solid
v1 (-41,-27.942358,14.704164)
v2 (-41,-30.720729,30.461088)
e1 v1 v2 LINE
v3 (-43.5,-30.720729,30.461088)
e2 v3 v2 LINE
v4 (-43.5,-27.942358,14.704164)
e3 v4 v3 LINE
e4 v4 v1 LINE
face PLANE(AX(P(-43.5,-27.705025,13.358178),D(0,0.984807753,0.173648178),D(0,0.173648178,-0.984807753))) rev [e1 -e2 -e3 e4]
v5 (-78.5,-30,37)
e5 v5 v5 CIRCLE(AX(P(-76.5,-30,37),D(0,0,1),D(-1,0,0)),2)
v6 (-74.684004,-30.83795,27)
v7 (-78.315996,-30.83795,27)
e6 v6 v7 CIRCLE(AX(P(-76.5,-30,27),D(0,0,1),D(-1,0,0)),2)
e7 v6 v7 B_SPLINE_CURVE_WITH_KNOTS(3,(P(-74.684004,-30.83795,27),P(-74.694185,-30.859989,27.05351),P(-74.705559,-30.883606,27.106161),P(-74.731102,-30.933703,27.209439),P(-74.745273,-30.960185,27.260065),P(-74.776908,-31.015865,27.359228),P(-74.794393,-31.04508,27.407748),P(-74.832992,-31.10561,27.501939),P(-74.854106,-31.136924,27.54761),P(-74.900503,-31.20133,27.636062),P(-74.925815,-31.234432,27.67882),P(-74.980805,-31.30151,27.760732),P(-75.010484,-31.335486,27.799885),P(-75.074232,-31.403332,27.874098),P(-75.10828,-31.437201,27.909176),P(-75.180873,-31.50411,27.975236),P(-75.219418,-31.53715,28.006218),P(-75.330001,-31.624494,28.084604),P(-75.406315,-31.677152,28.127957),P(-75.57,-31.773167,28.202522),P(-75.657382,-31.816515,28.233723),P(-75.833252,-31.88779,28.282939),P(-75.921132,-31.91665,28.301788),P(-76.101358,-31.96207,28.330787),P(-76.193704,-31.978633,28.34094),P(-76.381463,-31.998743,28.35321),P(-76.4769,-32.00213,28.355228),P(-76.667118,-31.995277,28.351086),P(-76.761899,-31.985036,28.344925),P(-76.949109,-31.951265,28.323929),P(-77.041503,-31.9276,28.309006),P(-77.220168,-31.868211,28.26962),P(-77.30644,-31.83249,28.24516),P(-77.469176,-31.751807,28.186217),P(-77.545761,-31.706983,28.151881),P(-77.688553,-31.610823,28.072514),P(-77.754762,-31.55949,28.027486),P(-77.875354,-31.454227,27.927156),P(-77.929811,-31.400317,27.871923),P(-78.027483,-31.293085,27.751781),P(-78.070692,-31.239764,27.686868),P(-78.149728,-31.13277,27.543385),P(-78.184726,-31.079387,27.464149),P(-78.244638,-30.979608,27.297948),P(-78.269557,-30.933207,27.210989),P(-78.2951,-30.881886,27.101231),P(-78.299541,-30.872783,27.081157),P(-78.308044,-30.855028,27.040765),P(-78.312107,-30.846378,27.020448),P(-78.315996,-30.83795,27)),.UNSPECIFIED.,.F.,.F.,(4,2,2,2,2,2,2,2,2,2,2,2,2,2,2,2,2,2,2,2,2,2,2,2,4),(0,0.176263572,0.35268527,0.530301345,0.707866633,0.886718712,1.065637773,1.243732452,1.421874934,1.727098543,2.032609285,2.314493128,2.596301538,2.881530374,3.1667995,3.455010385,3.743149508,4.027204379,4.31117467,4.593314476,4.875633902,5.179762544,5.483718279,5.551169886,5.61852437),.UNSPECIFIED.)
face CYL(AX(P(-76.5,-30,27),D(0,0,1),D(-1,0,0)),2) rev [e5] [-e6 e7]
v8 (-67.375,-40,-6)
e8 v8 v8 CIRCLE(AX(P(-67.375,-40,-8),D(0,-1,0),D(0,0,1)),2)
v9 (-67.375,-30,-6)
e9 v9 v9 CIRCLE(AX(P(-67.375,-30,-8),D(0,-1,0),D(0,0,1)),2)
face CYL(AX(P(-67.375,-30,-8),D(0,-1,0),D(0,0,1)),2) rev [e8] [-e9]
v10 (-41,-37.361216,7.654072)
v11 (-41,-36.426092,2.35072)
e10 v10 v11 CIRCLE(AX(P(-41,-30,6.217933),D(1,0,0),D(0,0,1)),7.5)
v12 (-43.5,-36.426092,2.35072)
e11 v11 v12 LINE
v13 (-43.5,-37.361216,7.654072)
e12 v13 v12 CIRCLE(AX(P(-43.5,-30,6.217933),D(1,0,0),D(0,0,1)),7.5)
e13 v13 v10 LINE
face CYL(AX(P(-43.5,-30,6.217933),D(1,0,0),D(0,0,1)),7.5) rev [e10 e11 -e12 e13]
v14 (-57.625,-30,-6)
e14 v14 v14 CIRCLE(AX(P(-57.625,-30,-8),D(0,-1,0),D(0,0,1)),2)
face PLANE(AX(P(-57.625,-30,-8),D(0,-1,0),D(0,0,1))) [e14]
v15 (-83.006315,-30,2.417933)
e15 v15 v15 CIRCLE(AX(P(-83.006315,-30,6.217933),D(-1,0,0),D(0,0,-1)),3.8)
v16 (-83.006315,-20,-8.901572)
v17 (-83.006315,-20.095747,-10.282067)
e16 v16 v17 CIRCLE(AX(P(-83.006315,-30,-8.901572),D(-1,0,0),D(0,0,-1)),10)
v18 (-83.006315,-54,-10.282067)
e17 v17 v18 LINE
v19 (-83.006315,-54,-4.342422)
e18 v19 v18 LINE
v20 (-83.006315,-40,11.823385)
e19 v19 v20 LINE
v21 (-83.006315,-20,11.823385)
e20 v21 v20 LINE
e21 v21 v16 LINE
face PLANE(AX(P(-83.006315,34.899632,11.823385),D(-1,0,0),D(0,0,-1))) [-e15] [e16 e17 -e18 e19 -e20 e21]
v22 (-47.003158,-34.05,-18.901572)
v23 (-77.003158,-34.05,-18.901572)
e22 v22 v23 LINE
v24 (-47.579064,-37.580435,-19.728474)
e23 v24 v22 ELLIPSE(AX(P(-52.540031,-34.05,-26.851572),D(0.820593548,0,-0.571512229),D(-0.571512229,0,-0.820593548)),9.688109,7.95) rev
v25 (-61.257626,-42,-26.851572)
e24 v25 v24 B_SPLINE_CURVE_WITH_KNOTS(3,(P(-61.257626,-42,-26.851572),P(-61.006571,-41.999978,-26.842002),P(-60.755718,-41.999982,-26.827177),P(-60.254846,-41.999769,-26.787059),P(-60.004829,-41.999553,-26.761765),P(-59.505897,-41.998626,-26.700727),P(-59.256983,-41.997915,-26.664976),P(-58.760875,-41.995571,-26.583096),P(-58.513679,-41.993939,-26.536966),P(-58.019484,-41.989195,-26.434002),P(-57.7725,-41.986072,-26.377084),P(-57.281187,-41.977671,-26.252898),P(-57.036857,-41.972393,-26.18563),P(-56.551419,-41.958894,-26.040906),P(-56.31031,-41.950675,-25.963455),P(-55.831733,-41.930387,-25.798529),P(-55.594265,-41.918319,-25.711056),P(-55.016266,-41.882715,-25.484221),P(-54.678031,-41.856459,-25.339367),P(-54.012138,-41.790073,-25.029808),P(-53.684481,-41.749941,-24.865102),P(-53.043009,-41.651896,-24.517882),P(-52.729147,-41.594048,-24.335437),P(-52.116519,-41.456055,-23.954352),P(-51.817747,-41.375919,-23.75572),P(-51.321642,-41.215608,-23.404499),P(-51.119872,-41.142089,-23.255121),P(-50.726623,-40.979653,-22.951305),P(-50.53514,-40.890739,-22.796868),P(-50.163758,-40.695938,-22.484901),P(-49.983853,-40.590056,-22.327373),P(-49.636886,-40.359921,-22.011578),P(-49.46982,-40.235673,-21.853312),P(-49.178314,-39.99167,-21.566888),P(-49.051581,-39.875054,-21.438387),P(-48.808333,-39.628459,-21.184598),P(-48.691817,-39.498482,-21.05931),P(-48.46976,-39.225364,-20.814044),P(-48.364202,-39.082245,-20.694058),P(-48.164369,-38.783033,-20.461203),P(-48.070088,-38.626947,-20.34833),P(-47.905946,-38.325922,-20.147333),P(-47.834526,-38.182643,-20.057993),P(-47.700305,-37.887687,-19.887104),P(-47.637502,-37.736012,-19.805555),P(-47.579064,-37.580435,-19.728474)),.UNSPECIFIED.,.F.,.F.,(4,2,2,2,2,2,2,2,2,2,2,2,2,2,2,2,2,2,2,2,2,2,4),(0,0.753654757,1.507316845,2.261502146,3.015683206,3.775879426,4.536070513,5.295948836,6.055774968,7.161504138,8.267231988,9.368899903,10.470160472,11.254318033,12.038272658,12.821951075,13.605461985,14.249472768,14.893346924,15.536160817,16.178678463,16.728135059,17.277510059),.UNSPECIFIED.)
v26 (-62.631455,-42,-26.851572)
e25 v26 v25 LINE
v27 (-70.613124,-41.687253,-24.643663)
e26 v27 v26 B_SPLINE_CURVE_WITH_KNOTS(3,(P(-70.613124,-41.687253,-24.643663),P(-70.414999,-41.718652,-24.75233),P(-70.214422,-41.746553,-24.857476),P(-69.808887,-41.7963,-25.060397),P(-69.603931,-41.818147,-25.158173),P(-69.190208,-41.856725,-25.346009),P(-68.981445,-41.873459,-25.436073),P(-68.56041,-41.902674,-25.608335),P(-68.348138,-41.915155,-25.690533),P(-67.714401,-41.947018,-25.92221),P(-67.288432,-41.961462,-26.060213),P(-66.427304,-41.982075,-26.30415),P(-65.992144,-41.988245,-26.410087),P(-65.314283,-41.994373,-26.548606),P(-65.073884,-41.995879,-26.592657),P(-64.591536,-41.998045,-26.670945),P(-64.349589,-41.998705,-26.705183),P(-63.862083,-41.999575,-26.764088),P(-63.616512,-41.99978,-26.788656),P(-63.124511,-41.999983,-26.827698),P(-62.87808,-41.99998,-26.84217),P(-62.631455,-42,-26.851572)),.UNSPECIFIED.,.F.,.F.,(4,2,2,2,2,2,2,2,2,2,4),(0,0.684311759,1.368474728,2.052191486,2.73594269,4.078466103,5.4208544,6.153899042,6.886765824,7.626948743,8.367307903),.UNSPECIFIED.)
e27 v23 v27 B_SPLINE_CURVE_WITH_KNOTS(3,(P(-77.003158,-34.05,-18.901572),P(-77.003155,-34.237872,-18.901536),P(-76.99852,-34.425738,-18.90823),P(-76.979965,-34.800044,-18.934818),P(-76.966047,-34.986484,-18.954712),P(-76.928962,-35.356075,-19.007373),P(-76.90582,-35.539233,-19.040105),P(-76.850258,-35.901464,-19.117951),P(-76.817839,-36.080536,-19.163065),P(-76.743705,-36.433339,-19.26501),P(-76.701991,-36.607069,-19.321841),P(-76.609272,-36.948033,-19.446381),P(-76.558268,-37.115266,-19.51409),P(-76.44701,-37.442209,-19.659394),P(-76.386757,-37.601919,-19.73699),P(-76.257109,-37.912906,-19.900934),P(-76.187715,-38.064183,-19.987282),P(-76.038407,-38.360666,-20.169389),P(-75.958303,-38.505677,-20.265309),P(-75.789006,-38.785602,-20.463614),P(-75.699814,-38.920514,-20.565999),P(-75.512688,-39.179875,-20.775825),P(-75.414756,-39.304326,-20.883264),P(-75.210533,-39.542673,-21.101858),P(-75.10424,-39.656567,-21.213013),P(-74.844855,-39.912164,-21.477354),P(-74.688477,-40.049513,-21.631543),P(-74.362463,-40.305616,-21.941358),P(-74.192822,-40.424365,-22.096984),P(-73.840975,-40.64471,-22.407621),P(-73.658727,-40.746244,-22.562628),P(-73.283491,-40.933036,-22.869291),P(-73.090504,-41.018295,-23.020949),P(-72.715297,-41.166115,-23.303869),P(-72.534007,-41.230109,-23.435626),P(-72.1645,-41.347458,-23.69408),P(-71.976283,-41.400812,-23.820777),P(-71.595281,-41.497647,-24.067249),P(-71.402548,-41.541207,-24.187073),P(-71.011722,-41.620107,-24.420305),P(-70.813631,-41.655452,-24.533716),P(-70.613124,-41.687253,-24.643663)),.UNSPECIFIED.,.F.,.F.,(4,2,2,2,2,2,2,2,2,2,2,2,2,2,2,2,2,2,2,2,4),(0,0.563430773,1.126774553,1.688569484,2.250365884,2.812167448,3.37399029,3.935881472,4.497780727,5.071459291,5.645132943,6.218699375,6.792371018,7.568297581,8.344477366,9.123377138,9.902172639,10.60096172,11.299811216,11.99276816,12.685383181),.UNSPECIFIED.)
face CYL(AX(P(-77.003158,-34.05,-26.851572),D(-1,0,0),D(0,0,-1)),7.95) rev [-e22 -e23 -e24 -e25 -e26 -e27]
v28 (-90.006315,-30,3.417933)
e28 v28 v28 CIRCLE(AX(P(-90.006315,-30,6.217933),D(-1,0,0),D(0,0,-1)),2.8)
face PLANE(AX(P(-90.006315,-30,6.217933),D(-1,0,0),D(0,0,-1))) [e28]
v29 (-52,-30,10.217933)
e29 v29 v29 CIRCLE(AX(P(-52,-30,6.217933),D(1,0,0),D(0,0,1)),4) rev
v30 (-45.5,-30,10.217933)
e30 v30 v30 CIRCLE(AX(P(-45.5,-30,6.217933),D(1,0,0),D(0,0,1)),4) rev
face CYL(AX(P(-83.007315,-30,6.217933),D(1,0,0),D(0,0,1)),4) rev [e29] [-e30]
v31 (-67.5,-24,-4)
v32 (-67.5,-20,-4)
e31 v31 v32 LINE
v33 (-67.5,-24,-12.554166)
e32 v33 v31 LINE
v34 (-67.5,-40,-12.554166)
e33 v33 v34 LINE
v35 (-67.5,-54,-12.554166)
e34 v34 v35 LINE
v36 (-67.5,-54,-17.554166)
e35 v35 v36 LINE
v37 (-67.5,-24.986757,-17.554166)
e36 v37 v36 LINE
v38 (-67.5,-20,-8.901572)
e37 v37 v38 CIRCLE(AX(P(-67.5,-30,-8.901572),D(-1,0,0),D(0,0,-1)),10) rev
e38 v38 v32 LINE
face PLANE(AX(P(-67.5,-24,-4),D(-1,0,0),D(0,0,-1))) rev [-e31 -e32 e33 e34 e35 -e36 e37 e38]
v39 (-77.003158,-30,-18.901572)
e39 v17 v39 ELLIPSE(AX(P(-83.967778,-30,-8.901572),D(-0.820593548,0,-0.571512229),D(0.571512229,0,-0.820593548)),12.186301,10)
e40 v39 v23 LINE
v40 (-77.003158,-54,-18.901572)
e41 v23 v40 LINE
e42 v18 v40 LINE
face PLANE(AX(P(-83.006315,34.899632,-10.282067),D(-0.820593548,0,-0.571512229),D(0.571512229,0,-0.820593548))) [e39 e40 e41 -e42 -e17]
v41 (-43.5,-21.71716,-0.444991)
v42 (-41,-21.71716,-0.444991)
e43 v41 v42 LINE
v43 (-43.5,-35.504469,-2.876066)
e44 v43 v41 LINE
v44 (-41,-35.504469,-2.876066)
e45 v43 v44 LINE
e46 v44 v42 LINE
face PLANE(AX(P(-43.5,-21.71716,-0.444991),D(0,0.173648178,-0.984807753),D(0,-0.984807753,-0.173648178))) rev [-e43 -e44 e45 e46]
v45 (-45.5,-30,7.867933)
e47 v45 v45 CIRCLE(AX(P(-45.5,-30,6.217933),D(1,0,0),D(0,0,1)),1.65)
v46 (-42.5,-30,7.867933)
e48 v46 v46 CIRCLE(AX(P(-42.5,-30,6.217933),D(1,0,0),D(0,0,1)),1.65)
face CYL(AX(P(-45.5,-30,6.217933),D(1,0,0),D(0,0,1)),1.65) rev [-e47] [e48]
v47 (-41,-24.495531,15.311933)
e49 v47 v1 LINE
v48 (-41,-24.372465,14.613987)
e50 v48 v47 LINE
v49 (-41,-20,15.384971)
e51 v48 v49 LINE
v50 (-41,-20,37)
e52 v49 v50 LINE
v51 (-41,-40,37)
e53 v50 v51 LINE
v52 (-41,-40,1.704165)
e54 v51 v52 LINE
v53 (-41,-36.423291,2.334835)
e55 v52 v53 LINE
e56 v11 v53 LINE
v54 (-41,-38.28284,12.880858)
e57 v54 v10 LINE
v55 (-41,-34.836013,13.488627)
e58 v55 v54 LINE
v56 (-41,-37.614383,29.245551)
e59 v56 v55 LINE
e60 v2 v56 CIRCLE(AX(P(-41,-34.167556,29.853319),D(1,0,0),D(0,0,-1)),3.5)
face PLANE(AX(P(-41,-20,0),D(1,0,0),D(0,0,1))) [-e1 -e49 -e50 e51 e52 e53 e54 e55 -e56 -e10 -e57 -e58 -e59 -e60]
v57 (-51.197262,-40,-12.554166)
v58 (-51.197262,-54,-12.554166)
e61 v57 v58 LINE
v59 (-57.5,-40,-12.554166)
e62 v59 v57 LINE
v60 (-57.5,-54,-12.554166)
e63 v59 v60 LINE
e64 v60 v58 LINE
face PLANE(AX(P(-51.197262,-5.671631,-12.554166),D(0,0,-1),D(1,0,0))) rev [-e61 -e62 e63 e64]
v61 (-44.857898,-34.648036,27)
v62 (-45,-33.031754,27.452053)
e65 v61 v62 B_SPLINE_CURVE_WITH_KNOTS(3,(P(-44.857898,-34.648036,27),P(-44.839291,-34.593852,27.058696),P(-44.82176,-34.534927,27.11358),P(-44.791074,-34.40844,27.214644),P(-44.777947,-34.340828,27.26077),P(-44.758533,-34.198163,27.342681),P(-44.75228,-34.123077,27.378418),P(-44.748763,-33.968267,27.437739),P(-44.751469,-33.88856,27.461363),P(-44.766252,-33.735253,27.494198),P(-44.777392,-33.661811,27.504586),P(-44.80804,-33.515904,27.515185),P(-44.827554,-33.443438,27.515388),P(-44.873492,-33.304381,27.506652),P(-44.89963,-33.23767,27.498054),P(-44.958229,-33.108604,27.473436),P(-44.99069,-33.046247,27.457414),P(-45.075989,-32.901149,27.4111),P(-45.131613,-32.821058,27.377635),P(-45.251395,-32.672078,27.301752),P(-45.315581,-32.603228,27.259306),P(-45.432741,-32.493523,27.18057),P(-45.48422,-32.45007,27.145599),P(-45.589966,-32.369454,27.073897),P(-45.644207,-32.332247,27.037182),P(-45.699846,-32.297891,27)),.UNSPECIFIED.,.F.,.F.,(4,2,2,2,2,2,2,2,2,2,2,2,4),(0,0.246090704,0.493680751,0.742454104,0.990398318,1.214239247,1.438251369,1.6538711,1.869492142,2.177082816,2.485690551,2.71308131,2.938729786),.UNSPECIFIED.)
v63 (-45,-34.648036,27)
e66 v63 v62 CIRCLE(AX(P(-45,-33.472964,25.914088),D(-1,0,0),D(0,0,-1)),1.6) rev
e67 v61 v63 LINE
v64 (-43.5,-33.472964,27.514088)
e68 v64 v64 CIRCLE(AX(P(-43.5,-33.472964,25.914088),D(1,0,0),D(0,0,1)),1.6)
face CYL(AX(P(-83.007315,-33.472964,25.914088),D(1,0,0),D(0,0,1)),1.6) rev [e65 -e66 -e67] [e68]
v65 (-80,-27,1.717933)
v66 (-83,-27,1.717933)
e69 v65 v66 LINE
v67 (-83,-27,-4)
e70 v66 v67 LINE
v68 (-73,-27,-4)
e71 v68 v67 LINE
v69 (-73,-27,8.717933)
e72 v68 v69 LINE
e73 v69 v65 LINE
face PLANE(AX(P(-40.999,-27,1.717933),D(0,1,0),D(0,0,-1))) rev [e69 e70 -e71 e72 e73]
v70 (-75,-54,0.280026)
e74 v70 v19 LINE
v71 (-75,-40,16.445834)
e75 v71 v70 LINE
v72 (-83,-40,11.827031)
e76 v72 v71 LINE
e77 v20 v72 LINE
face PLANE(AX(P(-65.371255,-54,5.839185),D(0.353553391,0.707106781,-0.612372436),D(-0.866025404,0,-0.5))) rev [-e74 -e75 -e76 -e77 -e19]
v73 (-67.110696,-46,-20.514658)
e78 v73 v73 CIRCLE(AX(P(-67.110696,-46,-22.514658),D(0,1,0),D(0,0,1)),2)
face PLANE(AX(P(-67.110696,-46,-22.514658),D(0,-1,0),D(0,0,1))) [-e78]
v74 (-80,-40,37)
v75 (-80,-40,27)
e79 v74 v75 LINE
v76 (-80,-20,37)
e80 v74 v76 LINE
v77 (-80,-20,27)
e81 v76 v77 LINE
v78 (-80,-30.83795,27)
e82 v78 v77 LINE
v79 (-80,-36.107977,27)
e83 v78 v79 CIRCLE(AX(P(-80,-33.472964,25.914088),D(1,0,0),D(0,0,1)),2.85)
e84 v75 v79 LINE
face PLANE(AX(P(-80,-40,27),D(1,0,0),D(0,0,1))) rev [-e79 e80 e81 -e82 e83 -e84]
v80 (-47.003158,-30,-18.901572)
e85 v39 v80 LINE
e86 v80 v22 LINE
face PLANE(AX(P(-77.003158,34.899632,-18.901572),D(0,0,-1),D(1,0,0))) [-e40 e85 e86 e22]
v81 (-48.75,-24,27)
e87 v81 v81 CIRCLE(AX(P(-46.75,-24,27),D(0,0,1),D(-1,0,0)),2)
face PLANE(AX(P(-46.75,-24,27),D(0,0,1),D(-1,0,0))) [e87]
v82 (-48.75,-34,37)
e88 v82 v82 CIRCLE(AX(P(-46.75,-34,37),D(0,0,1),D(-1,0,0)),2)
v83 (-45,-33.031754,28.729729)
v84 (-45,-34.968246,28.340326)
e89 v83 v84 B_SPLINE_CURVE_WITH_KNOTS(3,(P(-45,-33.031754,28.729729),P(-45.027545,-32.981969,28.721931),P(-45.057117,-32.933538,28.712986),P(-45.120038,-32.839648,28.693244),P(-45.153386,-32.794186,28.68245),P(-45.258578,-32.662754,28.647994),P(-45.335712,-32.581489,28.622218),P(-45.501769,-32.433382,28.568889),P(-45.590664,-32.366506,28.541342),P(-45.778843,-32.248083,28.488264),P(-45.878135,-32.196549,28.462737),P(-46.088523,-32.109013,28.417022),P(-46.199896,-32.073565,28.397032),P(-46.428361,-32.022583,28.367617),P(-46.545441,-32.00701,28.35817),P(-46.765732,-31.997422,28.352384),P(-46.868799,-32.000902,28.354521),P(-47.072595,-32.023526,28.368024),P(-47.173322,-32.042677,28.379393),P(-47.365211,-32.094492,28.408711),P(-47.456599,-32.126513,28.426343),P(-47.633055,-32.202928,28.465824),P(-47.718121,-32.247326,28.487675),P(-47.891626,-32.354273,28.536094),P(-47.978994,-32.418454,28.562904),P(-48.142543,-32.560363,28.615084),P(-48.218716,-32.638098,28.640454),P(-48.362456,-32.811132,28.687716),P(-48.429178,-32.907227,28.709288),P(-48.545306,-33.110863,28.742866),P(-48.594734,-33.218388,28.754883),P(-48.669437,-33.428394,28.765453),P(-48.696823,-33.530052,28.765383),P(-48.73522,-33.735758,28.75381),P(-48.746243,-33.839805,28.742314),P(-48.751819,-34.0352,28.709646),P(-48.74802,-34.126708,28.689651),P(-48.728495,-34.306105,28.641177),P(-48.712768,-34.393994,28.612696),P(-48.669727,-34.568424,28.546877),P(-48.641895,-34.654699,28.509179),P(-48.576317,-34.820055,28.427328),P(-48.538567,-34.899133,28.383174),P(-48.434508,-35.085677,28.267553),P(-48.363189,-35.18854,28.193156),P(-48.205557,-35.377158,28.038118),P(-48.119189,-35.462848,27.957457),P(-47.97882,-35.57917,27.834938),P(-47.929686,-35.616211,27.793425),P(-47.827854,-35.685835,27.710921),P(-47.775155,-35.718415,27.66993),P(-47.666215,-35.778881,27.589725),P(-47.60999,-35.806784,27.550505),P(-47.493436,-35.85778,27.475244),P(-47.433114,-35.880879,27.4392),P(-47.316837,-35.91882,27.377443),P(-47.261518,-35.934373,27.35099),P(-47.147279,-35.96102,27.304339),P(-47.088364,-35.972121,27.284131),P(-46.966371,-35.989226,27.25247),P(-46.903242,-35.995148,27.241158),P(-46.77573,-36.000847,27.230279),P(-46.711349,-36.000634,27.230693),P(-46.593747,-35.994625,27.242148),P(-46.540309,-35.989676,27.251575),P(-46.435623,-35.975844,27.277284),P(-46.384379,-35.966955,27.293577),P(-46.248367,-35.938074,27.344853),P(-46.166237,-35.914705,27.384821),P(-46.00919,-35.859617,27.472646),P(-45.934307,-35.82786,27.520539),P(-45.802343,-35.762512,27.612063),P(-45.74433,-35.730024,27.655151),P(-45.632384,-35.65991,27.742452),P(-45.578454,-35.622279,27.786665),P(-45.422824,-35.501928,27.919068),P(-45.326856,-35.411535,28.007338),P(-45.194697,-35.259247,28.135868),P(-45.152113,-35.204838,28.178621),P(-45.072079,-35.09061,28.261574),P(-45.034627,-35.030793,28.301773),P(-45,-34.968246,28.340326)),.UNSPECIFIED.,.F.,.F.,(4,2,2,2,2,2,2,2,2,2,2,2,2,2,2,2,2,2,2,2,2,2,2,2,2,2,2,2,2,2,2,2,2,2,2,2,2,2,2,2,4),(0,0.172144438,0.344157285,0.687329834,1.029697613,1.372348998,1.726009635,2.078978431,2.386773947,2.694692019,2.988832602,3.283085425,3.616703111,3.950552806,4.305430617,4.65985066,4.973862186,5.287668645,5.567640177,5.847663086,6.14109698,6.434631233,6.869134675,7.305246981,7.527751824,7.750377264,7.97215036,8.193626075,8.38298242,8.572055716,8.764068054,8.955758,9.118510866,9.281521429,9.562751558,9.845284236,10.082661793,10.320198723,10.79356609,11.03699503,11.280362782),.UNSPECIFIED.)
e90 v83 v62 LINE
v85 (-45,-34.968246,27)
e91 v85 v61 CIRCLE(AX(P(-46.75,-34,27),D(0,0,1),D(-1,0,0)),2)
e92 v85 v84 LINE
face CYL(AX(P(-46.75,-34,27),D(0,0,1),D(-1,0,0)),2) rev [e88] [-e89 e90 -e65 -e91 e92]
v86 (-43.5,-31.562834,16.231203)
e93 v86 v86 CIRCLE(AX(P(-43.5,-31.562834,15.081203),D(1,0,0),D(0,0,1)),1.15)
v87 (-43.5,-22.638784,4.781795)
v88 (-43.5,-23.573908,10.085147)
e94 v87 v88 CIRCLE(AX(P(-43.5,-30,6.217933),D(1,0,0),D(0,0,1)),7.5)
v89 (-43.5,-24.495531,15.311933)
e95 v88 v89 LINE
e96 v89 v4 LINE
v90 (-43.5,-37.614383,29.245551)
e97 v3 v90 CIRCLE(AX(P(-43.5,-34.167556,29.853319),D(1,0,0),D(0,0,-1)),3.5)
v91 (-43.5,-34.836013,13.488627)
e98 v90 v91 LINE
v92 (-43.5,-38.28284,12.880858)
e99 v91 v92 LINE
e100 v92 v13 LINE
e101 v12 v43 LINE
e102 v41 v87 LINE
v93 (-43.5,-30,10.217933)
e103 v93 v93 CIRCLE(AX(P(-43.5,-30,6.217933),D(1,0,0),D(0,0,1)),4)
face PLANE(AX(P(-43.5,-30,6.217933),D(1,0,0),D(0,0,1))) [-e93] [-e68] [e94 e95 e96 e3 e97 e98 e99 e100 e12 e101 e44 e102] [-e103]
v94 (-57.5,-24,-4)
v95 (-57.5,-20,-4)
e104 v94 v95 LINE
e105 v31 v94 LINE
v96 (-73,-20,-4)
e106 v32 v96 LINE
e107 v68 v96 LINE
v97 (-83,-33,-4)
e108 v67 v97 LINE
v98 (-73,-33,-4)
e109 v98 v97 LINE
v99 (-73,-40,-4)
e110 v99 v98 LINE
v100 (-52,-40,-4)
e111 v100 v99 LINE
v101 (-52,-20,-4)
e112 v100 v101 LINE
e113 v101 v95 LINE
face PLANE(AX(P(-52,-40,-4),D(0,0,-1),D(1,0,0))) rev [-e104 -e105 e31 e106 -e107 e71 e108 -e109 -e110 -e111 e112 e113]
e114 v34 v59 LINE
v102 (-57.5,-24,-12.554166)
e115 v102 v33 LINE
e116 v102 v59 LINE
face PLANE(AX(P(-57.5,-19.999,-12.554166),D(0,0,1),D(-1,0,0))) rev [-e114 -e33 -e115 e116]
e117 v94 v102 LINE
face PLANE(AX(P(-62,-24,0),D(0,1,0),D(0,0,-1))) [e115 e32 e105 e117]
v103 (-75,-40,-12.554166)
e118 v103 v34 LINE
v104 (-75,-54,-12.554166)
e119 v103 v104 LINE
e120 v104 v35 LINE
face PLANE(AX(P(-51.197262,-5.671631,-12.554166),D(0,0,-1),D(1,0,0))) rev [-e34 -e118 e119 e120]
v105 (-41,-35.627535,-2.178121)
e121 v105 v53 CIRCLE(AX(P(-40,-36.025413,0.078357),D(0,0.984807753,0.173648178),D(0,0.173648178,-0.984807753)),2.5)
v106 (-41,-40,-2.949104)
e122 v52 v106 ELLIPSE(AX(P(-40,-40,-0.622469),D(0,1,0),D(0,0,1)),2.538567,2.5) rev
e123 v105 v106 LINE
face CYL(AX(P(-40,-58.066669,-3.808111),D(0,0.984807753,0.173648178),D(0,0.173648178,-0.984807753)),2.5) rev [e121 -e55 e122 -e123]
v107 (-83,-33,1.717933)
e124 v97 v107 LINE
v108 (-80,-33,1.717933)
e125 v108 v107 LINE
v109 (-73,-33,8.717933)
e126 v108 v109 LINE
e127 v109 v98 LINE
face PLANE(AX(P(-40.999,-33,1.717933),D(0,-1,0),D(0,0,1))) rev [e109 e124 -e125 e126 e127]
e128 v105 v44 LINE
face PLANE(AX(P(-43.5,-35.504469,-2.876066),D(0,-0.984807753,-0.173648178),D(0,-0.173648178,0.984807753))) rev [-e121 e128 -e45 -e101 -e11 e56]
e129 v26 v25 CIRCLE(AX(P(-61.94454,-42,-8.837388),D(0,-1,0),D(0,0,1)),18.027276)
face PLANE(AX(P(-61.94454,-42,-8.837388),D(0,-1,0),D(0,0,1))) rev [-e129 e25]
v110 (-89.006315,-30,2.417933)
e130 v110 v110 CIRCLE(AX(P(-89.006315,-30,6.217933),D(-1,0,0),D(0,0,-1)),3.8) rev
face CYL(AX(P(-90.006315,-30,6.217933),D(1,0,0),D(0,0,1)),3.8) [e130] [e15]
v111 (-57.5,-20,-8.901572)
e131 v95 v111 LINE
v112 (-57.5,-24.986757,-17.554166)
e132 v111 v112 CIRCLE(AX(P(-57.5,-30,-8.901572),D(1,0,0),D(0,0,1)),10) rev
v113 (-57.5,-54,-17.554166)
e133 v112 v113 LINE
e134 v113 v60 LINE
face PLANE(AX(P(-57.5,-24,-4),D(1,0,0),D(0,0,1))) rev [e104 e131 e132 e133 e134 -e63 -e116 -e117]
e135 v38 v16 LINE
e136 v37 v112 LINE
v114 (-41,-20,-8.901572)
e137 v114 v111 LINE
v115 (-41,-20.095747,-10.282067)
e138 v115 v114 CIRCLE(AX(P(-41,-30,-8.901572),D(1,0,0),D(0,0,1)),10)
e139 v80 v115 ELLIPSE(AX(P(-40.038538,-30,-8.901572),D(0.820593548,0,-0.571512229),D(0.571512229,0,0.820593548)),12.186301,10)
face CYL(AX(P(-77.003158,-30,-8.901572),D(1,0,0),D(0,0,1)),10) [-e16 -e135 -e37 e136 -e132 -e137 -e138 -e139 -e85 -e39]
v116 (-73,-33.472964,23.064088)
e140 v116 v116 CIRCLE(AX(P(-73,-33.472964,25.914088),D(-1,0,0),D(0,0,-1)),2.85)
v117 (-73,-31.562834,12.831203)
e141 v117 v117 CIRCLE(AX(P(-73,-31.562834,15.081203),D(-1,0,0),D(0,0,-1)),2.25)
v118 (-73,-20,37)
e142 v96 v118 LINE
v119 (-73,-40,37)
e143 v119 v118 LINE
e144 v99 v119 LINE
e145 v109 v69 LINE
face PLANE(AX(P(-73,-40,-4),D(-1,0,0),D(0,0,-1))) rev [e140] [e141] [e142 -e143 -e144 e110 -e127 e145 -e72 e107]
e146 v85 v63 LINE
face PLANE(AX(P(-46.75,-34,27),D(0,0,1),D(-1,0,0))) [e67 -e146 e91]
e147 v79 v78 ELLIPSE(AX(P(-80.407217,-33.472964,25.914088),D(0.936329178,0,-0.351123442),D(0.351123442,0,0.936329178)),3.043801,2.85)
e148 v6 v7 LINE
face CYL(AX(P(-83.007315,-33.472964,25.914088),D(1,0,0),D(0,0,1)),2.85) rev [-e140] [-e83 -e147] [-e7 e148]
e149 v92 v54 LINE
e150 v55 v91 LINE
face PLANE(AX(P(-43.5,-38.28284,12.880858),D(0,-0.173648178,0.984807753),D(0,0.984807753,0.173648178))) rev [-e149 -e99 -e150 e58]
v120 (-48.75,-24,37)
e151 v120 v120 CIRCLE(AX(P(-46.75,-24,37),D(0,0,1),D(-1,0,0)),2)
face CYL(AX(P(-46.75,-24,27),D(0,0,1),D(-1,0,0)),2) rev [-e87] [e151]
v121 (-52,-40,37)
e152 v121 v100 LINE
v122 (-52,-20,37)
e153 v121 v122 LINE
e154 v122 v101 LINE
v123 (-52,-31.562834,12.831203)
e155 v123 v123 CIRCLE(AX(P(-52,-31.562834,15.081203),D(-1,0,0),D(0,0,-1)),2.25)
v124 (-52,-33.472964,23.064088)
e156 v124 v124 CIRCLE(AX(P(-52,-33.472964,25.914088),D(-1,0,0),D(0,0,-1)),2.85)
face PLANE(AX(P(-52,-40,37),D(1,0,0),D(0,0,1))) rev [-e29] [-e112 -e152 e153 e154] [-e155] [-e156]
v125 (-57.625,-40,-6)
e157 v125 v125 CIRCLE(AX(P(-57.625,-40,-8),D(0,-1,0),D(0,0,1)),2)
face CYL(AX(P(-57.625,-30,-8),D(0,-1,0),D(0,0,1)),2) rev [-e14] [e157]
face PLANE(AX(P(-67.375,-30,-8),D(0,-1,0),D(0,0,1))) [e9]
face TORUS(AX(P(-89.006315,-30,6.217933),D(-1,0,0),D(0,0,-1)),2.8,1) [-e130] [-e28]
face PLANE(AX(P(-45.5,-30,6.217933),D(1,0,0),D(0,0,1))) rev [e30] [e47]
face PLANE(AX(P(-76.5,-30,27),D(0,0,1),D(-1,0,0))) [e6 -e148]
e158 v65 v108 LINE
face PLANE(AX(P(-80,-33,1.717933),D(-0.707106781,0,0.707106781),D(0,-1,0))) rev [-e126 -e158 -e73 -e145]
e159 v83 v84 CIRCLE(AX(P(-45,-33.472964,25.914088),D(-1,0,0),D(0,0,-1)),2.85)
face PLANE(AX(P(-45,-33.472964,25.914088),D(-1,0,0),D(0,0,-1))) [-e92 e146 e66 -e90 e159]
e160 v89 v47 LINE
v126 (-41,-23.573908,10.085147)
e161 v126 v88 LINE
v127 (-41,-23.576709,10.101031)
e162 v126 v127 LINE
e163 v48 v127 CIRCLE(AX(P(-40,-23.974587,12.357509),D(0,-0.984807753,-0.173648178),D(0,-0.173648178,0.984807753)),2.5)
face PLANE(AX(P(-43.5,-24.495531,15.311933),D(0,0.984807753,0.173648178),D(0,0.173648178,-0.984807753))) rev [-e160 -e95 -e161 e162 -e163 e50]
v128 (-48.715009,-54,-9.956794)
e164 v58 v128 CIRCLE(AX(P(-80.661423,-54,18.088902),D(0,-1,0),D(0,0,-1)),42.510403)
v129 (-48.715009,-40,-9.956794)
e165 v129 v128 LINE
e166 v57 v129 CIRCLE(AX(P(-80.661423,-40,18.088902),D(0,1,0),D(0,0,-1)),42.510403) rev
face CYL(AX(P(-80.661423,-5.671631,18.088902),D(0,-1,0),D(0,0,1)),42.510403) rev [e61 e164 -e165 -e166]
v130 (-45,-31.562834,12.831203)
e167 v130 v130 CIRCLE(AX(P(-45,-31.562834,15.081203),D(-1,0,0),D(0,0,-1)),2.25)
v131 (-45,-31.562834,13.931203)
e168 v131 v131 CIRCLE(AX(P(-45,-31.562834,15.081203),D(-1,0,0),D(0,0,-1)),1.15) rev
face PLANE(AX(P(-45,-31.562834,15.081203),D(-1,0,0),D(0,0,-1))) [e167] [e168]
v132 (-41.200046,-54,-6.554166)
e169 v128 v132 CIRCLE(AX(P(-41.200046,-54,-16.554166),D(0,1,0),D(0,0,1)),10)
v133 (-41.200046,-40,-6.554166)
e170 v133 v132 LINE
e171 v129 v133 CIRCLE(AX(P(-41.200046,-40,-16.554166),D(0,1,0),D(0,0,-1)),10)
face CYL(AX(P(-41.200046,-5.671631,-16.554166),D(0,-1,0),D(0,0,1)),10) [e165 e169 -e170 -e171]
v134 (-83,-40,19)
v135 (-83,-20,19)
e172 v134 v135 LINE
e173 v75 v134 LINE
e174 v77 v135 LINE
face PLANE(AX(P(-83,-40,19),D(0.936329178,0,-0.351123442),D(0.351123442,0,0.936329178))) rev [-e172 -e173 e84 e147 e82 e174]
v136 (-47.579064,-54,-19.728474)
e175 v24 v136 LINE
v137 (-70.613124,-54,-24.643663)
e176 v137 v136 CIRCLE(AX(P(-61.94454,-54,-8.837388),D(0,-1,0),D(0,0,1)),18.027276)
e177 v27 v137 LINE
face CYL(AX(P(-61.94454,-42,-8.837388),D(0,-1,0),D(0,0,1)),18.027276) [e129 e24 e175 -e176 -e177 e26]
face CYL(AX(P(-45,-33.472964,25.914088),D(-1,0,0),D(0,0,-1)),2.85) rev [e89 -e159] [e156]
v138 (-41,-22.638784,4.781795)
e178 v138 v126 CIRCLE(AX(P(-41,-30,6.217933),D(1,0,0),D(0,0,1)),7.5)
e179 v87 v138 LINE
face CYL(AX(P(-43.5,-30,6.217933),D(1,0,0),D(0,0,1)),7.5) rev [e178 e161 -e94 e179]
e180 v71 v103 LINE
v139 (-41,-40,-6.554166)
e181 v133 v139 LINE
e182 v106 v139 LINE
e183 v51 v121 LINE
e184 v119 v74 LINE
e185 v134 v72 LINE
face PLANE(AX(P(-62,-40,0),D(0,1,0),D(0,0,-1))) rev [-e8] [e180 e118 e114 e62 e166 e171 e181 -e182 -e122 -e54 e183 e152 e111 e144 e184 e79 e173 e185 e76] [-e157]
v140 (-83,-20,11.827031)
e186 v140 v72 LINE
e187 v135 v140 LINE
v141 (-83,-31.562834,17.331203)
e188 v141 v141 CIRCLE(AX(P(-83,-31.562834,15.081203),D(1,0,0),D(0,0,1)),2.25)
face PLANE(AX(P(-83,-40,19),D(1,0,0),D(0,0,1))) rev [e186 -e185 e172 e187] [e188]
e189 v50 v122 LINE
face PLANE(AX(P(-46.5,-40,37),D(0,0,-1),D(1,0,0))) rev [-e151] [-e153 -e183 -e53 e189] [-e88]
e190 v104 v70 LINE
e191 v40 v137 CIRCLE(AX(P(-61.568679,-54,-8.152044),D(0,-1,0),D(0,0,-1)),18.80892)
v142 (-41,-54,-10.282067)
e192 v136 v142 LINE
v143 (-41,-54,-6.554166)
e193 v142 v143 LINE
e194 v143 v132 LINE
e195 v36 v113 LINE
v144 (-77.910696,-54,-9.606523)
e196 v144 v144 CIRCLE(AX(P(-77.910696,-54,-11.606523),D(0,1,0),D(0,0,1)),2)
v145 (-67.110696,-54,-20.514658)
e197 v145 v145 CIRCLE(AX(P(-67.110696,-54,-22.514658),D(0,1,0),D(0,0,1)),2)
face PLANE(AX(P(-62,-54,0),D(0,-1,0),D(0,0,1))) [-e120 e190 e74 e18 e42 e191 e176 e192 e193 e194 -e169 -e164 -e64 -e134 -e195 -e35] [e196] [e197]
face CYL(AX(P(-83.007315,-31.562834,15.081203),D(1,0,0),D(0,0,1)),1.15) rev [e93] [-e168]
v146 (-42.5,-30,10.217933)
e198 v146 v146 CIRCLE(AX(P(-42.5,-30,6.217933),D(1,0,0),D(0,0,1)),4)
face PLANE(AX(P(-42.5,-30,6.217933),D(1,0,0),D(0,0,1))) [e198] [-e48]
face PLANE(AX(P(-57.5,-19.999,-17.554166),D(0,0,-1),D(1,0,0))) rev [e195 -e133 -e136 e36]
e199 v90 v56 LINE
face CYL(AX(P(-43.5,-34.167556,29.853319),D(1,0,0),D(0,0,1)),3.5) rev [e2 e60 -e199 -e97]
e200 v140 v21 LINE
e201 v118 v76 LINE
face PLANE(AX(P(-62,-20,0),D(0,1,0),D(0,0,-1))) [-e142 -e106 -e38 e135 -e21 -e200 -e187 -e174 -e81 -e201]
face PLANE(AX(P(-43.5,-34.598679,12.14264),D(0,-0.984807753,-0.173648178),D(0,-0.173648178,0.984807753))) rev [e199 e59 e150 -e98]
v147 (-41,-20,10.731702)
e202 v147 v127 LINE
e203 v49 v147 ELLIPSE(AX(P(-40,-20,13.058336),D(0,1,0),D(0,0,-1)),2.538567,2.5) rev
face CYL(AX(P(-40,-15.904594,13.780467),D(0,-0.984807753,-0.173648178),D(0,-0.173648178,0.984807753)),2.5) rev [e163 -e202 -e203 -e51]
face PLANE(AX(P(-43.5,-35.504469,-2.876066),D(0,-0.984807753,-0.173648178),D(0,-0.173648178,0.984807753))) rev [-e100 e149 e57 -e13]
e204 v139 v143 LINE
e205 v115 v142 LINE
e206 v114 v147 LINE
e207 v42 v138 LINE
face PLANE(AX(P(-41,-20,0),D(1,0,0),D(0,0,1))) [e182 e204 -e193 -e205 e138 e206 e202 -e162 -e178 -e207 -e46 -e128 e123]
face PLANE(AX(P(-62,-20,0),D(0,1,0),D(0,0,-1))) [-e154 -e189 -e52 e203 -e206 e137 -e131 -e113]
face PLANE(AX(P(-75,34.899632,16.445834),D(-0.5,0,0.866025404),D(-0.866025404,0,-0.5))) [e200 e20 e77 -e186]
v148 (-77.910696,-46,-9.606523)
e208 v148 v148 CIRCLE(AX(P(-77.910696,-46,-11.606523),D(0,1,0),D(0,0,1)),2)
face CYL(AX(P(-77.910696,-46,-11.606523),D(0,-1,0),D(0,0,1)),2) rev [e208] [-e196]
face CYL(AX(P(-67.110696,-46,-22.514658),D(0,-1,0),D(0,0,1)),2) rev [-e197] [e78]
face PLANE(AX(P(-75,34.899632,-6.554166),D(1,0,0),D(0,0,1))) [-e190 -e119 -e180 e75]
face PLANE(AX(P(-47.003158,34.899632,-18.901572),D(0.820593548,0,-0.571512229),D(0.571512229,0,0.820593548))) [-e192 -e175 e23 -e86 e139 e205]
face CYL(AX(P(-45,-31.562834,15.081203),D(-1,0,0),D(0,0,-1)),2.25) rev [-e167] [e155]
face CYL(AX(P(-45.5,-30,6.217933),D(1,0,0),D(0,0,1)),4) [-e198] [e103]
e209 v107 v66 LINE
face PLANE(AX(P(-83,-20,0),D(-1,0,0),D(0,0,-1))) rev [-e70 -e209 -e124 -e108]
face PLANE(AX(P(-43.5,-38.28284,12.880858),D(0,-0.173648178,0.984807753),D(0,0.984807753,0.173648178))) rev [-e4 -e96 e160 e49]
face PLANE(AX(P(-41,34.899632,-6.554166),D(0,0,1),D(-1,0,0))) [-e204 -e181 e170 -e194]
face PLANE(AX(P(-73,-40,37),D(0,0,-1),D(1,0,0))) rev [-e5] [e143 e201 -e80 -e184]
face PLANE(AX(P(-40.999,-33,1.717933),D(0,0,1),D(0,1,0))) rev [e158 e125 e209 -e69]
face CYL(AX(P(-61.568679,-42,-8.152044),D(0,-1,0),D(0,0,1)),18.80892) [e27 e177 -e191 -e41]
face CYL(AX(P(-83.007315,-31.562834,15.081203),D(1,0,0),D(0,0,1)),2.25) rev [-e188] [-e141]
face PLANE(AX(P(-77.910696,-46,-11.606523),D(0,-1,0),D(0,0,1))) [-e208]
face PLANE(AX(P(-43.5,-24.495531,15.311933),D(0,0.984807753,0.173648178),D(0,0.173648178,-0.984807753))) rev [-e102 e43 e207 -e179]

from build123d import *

# Parameters (mm, degrees)
BOSS_EXTRUDE1_DEPTH             = 20
SKETCH6_W                       = 25
SKETCH6_H                       = 20
BOSS_EXTRUDE5_DEPTH             = 5.5
BOSS_EXTRUDE11_START            = -20
BOSS_EXTRUDE11_DEPTH            = 34
SKETCH4_R                       = 2
CUT_EXTRUDE1_DEPTH              = 10
BOSS_EXTRUDE13_DEPTH            = 12
FILLET11_START                  = 14.0499999
FILLET11_DEPTH                  = 7.9500001
FILLET11_START_2                = -14.996842371
FILLET11_2_DEPTH                = 30.996842371
CHAMFER1_SIZE                   = 14
SKETCH26_W                      = 22
SKETCH26_H                      = 20
BOSS_EXTRUDE14_DEPTH            = 11
CUT_EXTRUDE7_DEPTH              = 2.5
CUT_EXTRUDE8_REACH              = 65.92
SKETCH27_R                      = 4
SKETCH27_R_2                    = 1.15
SKETCH27_R_3                    = 1.6
CUT_EXTRUDE9_DEPTH              = 2.5
CUT_EXTRUDE10_REACH             = 50.596
SKETCH29_R                      = 2.5
CUT_EXTRUDE11_REACH             = 55.607
SKETCH30_R                      = 2.5
BOSS_EXTRUDE15_DEPTH            = 1
BOSS_EXTRUDE15_DEPTH_BACK       = 2
SKETCH31_R                      = 4
SKETCH31_R_2                    = 1.65
SKETCH32_R                      = 2.85
SKETCH32_R_2                    = 2.25
CUT_EXTRUDE12_DEPTH             = 7
CUT_EXTRUDE12_DIRECTION_2_REACH = 61.046
SKETCH33_R                      = 3.8
BOSS_EXTRUDE17_DEPTH            = 7
FILLET17_R                      = 1
CUT_EXTRUDE13_DEPTH             = 14
SKETCH36_R                      = 2
CUT_EXTRUDE14_DEPTH             = 10
FILLET18_R                      = 10
CUT_EXTRUDE16_REACH             = 67.49
SKETCH37_W                      = 5.717933373
SKETCH37_H                      = 6
CHAMFER2_SIZE                   = 7
SKETCH38_W                      = 10
SKETCH38_H                      = 20
CUT_EXTRUDE17_DEPTH             = 4
CUT_EXTRUDE19_REACH             = 59.527
SKETCH39_W                      = 10
SKETCH39_H                      = 5
CUT_EXTRUDE20_DEPTH             = 112.274986141
CUT_EXTRUDE20_DEPTH_BACK        = 112.274986141
SKETCH40_W                      = 63.577932813
SKETCH40_H                      = 85.383198243
SKETCH41_R                      = 2
CUT_EXTRUDE21_DEPTH             = 8
CUT_EXTRUDE22_DEPTH             = 119.920656492
CUT_EXTRUDE22_DEPTH_BACK        = 119.920656492
SKETCH42_W                      = 84.196844861
SKETCH42_H                      = 67.727613246


with BuildPart() as part:
    # Sketch1 → Boss-Extrude1 (new body)
    with BuildSketch(Plane(origin=(0, 0, 0), x_dir=(1, 0, 0), z_dir=(0, 1, 0))):
        Polygon((-15.5, -37), (-10, -37), (-10, 4), (11, 4), (11, -37), (18, -37), (18, -27), (21, -19), (21, 10), (-15.5, 10), align=None)
    extrude(amount=BOSS_EXTRUDE1_DEPTH)

    # Sketch6 → Boss-Extrude5 (add)
    with BuildSketch(Plane.ZY.offset(15.5)):
        with Locations((2.5, 10)):
            Rectangle(SKETCH6_W, SKETCH6_H)
    extrude(amount=BOSS_EXTRUDE5_DEPTH)

    # Sketch20 → Boss-Extrude11 (add)
    with BuildSketch(Plane(origin=(0, 20, 0), x_dir=(1, 0, 0), z_dir=(0, 1, 0)).offset(BOSS_EXTRUDE11_START)):
        Polygon((-21, 6.554166437), (13, 6.554166437), (13, -16.445833563), (21.006315459, -11.823385178), (21.006315459, 10.282066627), (15.003157729, 18.901571597), (-14.996842271, 18.901571597), (-21, 10.282066627), align=None)
    extrude(amount=BOSS_EXTRUDE11_DEPTH)

    # Sketch4 → Cut-Extrude1 (cut)
    with BuildSketch(Plane(origin=(0, 20, 0), x_dir=(1, 0, 0), z_dir=(0, 1, 0))):
        with Locations(Location((-4.375, 8, 0), (0, 0, 270))):
            Circle(SKETCH4_R)
        with Locations(Location((5.375, 8, 0), (0, 0, 270))):
            Circle(SKETCH4_R)
    extrude(amount=-CUT_EXTRUDE1_DEPTH, mode=Mode.SUBTRACT)

    # Sketch24 → Boss-Extrude13 (add)
    with BuildSketch(Plane(origin=(0, 34, 0), x_dir=(1, 0, 0), z_dir=(0, 1, 0))):
        with BuildLine():
            Line((-14.996842271, 18.901571597), (-14.420936492, 19.728473528))
            ThreePointArc((-14.420936492, 19.728473528), (-3.81756267, 26.467738085), (8.613124034, 24.643662635))
            ThreePointArc((8.613124034, 24.643662635), (12.140366622, 22.142331504), (15.003157729, 18.901571597))
            Line((15.003157729, 18.901571597), (21.006315459, 10.282066627))
            Line((21.006315459, 10.282066627), (21.006315459, 6.554166437))
            Line((21.006315459, 6.554166437), (-21, 6.554166437))
            Line((-21, 6.554166437), (-21, 10.282066627))
            Line((-21, 10.282066627), (-14.996842271, 18.901571597))
        make_face()
    extrude(amount=-BOSS_EXTRUDE13_DEPTH)

    # Fillet11: read off the stored shape, not the designer's step
    # Fillet11 outline → Fillet11 (add)
    with BuildSketch(Plane(origin=(0, 0, 0), x_dir=(1, 0, 0), z_dir=(0, 1, 0)).offset(FILLET11_START)):
        with BuildLine():
            Line((-14.996842271, 18.901571597), (15.003161757, 18.901565813))
            ThreePointArc((15.003161757, 18.901565813), (12.140369243, 22.142329149), (8.613124034, 24.643662635))
            ThreePointArc((8.613124034, 24.643662635), (-3.81756267, 26.467738085), (-14.420936492, 19.728473528))
            Line((-14.420936492, 19.728473528), (-14.996842271, 18.901571597))
        make_face()
    extrude(amount=FILLET11_DEPTH)

    # Fillet11 2 outline → Fillet11 2 (cut)
    with BuildSketch(Plane.YZ.offset(FILLET11_START_2)):
        with BuildLine():
            Line((22, -28), (22, -26.851571597))
            ThreePointArc((22, -26.851571597), (19.67149891, -21.230072687), (14.05, -18.901571597))
            Line((14.05, -18.901571597), (14.0499999, -28))
            Line((14.0499999, -28), (22, -28))
        make_face()
    extrude(amount=FILLET11_2_DEPTH, mode=Mode.SUBTRACT)

    # Chamfer1
    chamfer1_edges = [part.edges().sort_by_distance(p)[0] for p in [
        (17.003157729, 34, 14.134609371),
    ]]
    chamfer(chamfer1_edges, length=CHAMFER1_SIZE)

    # Sketch26 → Boss-Extrude14 (add)
    with BuildSketch(Plane.ZY.offset(21)):
        with Locations((26, 10)):
            Rectangle(SKETCH26_W, SKETCH26_H)
    extrude(amount=-BOSS_EXTRUDE14_DEPTH)

    # Sketch25 → Cut-Extrude7 (cut)
    with BuildSketch(Plane.ZY.offset(21)):
        with BuildLine():
            Line((12.142640366, 14.598678837), (29.245550824, 17.6143834))
            ThreePointArc((29.245550824, 17.6143834), (33.300146581, 14.775324886), (30.461088067, 10.720729128))
            Line((30.461088067, 10.720729128), (13.35817761, 7.705024566))
            ThreePointArc((13.35817761, 7.705024566), (-1.168124774, 8.697638667), (12.142640366, 14.598678837))
        make_face()
    extrude(amount=-CUT_EXTRUDE7_DEPTH, mode=Mode.SUBTRACT)

    # Sketch27 → Cut-Extrude8 (cut, up to next)
    with BuildSketch(Plane.ZY.offset(18.5), mode=Mode.PRIVATE) as cut_extrude8_sk1:
        with Locations((6.217933373, 10)):
            Circle(SKETCH27_R)
    cut_extrude8_tool1 = extrude(cut_extrude8_sk1.sketch, amount=-CUT_EXTRUDE8_REACH, mode=Mode.PRIVATE) & part.part
    # Sketch27 → Cut-Extrude8 (cut, up to next)
    with BuildSketch(Plane.ZY.offset(18.5), mode=Mode.PRIVATE) as cut_extrude8_sk2:
        with Locations((15.08120315, 11.562833599)):
            Circle(SKETCH27_R_2)
    cut_extrude8_tool2 = extrude(cut_extrude8_sk2.sketch, amount=-CUT_EXTRUDE8_REACH, mode=Mode.PRIVATE) & part.part
    # Sketch27 → Cut-Extrude8 (cut, up to next)
    with BuildSketch(Plane.ZY.offset(18.5), mode=Mode.PRIVATE) as cut_extrude8_sk3:
        with Locations((25.914088433, 13.472963553)):
            Circle(SKETCH27_R_3)
    cut_extrude8_tool3 = extrude(cut_extrude8_sk3.sketch, amount=-CUT_EXTRUDE8_REACH, mode=Mode.PRIVATE) & part.part
    add(cut_extrude8_tool1.solids().sort_by_distance((-18.5, 10, 6.217933))[0], mode=Mode.SUBTRACT)
    add(cut_extrude8_tool2.solids().sort_by_distance((-18.5, 11.562834, 15.081203))[0], mode=Mode.SUBTRACT)
    add(cut_extrude8_tool3.solids().sort_by_distance((-18.5, 13.472964, 25.914088))[0], mode=Mode.SUBTRACT)

    # Sketch28 → Cut-Extrude9 (cut)
    with BuildSketch(Plane.ZY.offset(21)):
        Polygon((-2.876065895, 15.50446885), (12.880858154, 18.282839692), (15.311932641, 4.49553115), (-0.444991407, 1.717160308), align=None)
    extrude(amount=-CUT_EXTRUDE9_DEPTH, mode=Mode.SUBTRACT)

    # Cut-Extrude10: up to this plane
    cut_extrude10_end = Plane(origin=(0, 20, 0), z_dir=(0, -1, 0))
    # Sketch29 → Cut-Extrude10 (cut, up to the surface)
    with BuildSketch(Plane(origin=(0, 15.528788143, -2.738144327), x_dir=(1, 0, 0), z_dir=(0, -0.9848077530122088, 0.17364817766692708)), mode=Mode.PRIVATE) as cut_extrude10_sk1:
        with Locations((-22, 2.85995077)):
            Circle(SKETCH29_R)
    cut_extrude10_tool1 = split(extrude(cut_extrude10_sk1.sketch, amount=-CUT_EXTRUDE10_REACH, mode=Mode.PRIVATE), bisect_by=cut_extrude10_end, keep=Keep.BOTH, mode=Mode.PRIVATE)
    add(cut_extrude10_tool1.solids().sort_by_distance((-22, 16.025413, 0.078357))[0], mode=Mode.SUBTRACT)

    # Cut-Extrude11: up to this plane
    cut_extrude11_end = Plane(origin=(0, 0, 0), z_dir=(0, -1, 0))
    # Sketch30 → Cut-Extrude11 (cut, up to the surface)
    with BuildSketch(Plane(origin=(0, 1.741479601, -0.30706984), x_dir=(1, 0, 0), z_dir=(0, 0.9848077530122086, -0.17364817766692728)), mode=Mode.PRIVATE) as cut_extrude11_sk1:
        with Locations((-22, -12.85995077)):
            Circle(SKETCH30_R)
    cut_extrude11_tool1 = split(extrude(cut_extrude11_sk1.sketch, amount=-CUT_EXTRUDE11_REACH, mode=Mode.PRIVATE), bisect_by=cut_extrude11_end, keep=Keep.BOTH, mode=Mode.PRIVATE)
    add(cut_extrude11_tool1.solids().sort_by_distance((-22, 3.974587, 12.357509))[0], mode=Mode.SUBTRACT)

    # Sketch31 → Boss-Extrude15 (add, two sides: drawn at the far end of the back side and taken through both)
    with BuildSketch(Plane.ZY.offset(18.5).offset(-BOSS_EXTRUDE15_DEPTH_BACK)):
        with Locations((6.217933373, 10)):
            Circle(SKETCH31_R)
        with Locations((6.217933373, 10)):
            Circle(SKETCH31_R_2, mode=Mode.SUBTRACT)
    extrude(amount=BOSS_EXTRUDE15_DEPTH + BOSS_EXTRUDE15_DEPTH_BACK)

    # Sketch32 → Cut-Extrude12 (cut)
    with BuildSketch(Plane(origin=(-10, 0, 0), x_dir=(0, 0, -1), z_dir=(1, 0, 0))):
        with Locations((-25.914088433, 13.472963553)):
            Circle(SKETCH32_R)
        with Locations((-15.08120315, 11.562833599)):
            Circle(SKETCH32_R_2)
    extrude(amount=-CUT_EXTRUDE12_DEPTH, mode=Mode.SUBTRACT)

    # Sketch32 → Cut-Extrude12 direction 2 (cut, up to next)
    with BuildSketch(Plane(origin=(-10, 0, 0), x_dir=(0, 0, -1), z_dir=(1, 0, 0)), mode=Mode.PRIVATE) as cut_extrude12_direction_2_sk1:
        with Locations((-25.914088433, 13.472963553)):
            Circle(SKETCH32_R)
    cut_extrude12_direction_2_tool1 = extrude(cut_extrude12_direction_2_sk1.sketch, amount=CUT_EXTRUDE12_DIRECTION_2_REACH, mode=Mode.PRIVATE) & part.part
    # Sketch32 → Cut-Extrude12 direction 2 (cut, up to next)
    with BuildSketch(Plane(origin=(-10, 0, 0), x_dir=(0, 0, -1), z_dir=(1, 0, 0)), mode=Mode.PRIVATE) as cut_extrude12_direction_2_sk2:
        with Locations((-15.08120315, 11.562833599)):
            Circle(SKETCH32_R_2)
    cut_extrude12_direction_2_tool2 = extrude(cut_extrude12_direction_2_sk2.sketch, amount=CUT_EXTRUDE12_DIRECTION_2_REACH, mode=Mode.PRIVATE) & part.part
    add(cut_extrude12_direction_2_tool1.solids().sort_by_distance((-10, 13.472964, 25.914088))[0], mode=Mode.SUBTRACT)
    add(cut_extrude12_direction_2_tool2.solids().sort_by_distance((-10, 11.562834, 15.081203))[0], mode=Mode.SUBTRACT)

    # Sketch33 → Boss-Extrude17 (add)
    with BuildSketch(Plane(origin=(21.006315459, 0, 0), x_dir=(0, 0, -1), z_dir=(1, 0, 0))):
        with Locations((-6.217933373, 10)):
            Circle(SKETCH33_R)
    extrude(amount=BOSS_EXTRUDE17_DEPTH)

    # Fillet17
    fillet17_edges = [part.edges().sort_by_distance(p)[0] for p in [
        (28.006315459, 10, 10.017933373),
    ]]
    fillet(fillet17_edges, radius=FILLET17_R)

    # Sketch35 → Cut-Extrude13 (cut)
    with BuildSketch(Plane(origin=(0, 34, 0), x_dir=(1, 0, 0), z_dir=(0, 1, 0))):
        with BuildLine():
            Line((-20.79995418, 6.554166437), (13, 6.554166437))
            Line((13, 6.554166437), (13, 12.554166437))
            Line((13, 12.554166437), (-10.802737675, 12.554166437))
            ThreePointArc((-10.802737675, 12.554166437), (-12.071315957, 11.281715365), (-13.284990593, 9.95679406))
            ThreePointArc((-13.284990593, 9.95679406), (-16.675255632, 7.444453934), (-20.79995418, 6.554166437))
        make_face()
    extrude(amount=-CUT_EXTRUDE13_DEPTH, mode=Mode.SUBTRACT)

    # Sketch36 → Cut-Extrude14 (cut)
    with BuildSketch(Plane.XY.offset(37)):
        with Locations((-15.25, 14)):
            Circle(SKETCH36_R)
        with Locations((14.5, 10)):
            Circle(SKETCH36_R)
        with Locations((-15.25, 4)):
            Circle(SKETCH36_R)
    extrude(amount=-CUT_EXTRUDE14_DEPTH, mode=Mode.SUBTRACT)

    # Fillet18
    fillet18_edges = [part.edges().sort_by_distance(p)[0] for p in [
        (0.003157729, 0, -18.901571597),
    ]]
    fillet(fillet18_edges, radius=FILLET18_R)

    # Sketch37 → Cut-Extrude16 (cut, up to next)
    with BuildSketch(Plane(origin=(21, 0, 0), x_dir=(0, 0, -1), z_dir=(1, 0, 0)), mode=Mode.PRIVATE) as cut_extrude16_sk1:
        with Locations((1.141033313, 10)):
            Rectangle(SKETCH37_W, SKETCH37_H)
    cut_extrude16_tool1 = extrude(cut_extrude16_sk1.sketch, amount=-CUT_EXTRUDE16_REACH, mode=Mode.PRIVATE) & part.part
    add(cut_extrude16_tool1.solids().sort_by_distance((21, 10, -1.141033))[0], mode=Mode.SUBTRACT)

    # Chamfer2
    chamfer2_edges = [part.edges().sort_by_distance(p)[0] for p in [
        (11, 10, 1.717933373),
    ]]
    chamfer(chamfer2_edges, length=CHAMFER2_SIZE)

    # Sketch38 → Cut-Extrude17 (cut)
    with BuildSketch(Plane.XZ):
        with Locations((0.5, -14)):
            Rectangle(SKETCH38_W, SKETCH38_H)
    extrude(amount=-CUT_EXTRUDE17_DEPTH, mode=Mode.SUBTRACT)

    # Sketch39 → Cut-Extrude19 (cut, up to next)
    with BuildSketch(Plane(origin=(0, 34, 0), x_dir=(1, 0, 0), z_dir=(0, 1, 0)), mode=Mode.PRIVATE) as cut_extrude19_sk1:
        with Locations((0.5, 15.054166437)):
            Rectangle(SKETCH39_W, SKETCH39_H)
    cut_extrude19_tool1 = extrude(cut_extrude19_sk1.sketch, amount=-CUT_EXTRUDE19_REACH, mode=Mode.PRIVATE) & part.part
    add(cut_extrude19_tool1.solids().sort_by_distance((0.5, 34, -15.054166))[0], mode=Mode.SUBTRACT)


with BuildPart() as body_2:
    # Mirror1: mirrored copy
    add(part.part.mirror(Plane.ZY.offset(31)))

    # Sketch41 → Cut-Extrude21 (cut)
    with BuildSketch(Plane(origin=(0, 34, 0), x_dir=(1, 0, 0), z_dir=(0, 1, 0))):
        with Locations(Location((-67.110696208, 22.514658427, 0), (0, 0, 270))):
            Circle(SKETCH41_R)
        with Locations(Location((-77.910696208, 11.606522541, 0), (0, 0, 270))):
            Circle(SKETCH41_R)
    extrude(amount=-CUT_EXTRUDE21_DEPTH, mode=Mode.SUBTRACT)


with BuildPart() as part_1:
    add(part.part)

    # Sketch40 → Cut-Extrude20 (cut, two sides: drawn at the far end of the back side and taken through both)
    with BuildSketch(Plane(origin=(0, 0, -18.901571597), x_dir=(-1, 0, 0), z_dir=(0, 0, -1)).offset(-CUT_EXTRUDE20_DEPTH_BACK)):
        with Locations((-5.368663992, 38.471473394)):
            Rectangle(SKETCH40_W, SKETCH40_H)
    extrude(amount=CUT_EXTRUDE20_DEPTH + CUT_EXTRUDE20_DEPTH_BACK, mode=Mode.SUBTRACT)


with BuildPart() as body_2_2:
    # Mirror2: mirrored copy
    add(body_2.part.mirror(Plane(origin=(0, -10, 0), x_dir=(0, 0, 1), z_dir=(0, -1, 0))))


with BuildPart() as body_2_1:
    add(body_2.part)

    # Sketch42 → Cut-Extrude22 (cut, two sides: drawn at the far end of the back side and taken through both)
    with BuildSketch(Plane(origin=(0, 0, -18.901571597), x_dir=(-1, 0, 0), z_dir=(0, 0, -1)).offset(-CUT_EXTRUDE22_DEPTH_BACK)):
        with Locations((54.256170368, 21.919920772)):
            Rectangle(SKETCH42_W, SKETCH42_H)
    extrude(amount=CUT_EXTRUDE22_DEPTH + CUT_EXTRUDE22_DEPTH_BACK, mode=Mode.SUBTRACT)


solid = body_2_2.part
